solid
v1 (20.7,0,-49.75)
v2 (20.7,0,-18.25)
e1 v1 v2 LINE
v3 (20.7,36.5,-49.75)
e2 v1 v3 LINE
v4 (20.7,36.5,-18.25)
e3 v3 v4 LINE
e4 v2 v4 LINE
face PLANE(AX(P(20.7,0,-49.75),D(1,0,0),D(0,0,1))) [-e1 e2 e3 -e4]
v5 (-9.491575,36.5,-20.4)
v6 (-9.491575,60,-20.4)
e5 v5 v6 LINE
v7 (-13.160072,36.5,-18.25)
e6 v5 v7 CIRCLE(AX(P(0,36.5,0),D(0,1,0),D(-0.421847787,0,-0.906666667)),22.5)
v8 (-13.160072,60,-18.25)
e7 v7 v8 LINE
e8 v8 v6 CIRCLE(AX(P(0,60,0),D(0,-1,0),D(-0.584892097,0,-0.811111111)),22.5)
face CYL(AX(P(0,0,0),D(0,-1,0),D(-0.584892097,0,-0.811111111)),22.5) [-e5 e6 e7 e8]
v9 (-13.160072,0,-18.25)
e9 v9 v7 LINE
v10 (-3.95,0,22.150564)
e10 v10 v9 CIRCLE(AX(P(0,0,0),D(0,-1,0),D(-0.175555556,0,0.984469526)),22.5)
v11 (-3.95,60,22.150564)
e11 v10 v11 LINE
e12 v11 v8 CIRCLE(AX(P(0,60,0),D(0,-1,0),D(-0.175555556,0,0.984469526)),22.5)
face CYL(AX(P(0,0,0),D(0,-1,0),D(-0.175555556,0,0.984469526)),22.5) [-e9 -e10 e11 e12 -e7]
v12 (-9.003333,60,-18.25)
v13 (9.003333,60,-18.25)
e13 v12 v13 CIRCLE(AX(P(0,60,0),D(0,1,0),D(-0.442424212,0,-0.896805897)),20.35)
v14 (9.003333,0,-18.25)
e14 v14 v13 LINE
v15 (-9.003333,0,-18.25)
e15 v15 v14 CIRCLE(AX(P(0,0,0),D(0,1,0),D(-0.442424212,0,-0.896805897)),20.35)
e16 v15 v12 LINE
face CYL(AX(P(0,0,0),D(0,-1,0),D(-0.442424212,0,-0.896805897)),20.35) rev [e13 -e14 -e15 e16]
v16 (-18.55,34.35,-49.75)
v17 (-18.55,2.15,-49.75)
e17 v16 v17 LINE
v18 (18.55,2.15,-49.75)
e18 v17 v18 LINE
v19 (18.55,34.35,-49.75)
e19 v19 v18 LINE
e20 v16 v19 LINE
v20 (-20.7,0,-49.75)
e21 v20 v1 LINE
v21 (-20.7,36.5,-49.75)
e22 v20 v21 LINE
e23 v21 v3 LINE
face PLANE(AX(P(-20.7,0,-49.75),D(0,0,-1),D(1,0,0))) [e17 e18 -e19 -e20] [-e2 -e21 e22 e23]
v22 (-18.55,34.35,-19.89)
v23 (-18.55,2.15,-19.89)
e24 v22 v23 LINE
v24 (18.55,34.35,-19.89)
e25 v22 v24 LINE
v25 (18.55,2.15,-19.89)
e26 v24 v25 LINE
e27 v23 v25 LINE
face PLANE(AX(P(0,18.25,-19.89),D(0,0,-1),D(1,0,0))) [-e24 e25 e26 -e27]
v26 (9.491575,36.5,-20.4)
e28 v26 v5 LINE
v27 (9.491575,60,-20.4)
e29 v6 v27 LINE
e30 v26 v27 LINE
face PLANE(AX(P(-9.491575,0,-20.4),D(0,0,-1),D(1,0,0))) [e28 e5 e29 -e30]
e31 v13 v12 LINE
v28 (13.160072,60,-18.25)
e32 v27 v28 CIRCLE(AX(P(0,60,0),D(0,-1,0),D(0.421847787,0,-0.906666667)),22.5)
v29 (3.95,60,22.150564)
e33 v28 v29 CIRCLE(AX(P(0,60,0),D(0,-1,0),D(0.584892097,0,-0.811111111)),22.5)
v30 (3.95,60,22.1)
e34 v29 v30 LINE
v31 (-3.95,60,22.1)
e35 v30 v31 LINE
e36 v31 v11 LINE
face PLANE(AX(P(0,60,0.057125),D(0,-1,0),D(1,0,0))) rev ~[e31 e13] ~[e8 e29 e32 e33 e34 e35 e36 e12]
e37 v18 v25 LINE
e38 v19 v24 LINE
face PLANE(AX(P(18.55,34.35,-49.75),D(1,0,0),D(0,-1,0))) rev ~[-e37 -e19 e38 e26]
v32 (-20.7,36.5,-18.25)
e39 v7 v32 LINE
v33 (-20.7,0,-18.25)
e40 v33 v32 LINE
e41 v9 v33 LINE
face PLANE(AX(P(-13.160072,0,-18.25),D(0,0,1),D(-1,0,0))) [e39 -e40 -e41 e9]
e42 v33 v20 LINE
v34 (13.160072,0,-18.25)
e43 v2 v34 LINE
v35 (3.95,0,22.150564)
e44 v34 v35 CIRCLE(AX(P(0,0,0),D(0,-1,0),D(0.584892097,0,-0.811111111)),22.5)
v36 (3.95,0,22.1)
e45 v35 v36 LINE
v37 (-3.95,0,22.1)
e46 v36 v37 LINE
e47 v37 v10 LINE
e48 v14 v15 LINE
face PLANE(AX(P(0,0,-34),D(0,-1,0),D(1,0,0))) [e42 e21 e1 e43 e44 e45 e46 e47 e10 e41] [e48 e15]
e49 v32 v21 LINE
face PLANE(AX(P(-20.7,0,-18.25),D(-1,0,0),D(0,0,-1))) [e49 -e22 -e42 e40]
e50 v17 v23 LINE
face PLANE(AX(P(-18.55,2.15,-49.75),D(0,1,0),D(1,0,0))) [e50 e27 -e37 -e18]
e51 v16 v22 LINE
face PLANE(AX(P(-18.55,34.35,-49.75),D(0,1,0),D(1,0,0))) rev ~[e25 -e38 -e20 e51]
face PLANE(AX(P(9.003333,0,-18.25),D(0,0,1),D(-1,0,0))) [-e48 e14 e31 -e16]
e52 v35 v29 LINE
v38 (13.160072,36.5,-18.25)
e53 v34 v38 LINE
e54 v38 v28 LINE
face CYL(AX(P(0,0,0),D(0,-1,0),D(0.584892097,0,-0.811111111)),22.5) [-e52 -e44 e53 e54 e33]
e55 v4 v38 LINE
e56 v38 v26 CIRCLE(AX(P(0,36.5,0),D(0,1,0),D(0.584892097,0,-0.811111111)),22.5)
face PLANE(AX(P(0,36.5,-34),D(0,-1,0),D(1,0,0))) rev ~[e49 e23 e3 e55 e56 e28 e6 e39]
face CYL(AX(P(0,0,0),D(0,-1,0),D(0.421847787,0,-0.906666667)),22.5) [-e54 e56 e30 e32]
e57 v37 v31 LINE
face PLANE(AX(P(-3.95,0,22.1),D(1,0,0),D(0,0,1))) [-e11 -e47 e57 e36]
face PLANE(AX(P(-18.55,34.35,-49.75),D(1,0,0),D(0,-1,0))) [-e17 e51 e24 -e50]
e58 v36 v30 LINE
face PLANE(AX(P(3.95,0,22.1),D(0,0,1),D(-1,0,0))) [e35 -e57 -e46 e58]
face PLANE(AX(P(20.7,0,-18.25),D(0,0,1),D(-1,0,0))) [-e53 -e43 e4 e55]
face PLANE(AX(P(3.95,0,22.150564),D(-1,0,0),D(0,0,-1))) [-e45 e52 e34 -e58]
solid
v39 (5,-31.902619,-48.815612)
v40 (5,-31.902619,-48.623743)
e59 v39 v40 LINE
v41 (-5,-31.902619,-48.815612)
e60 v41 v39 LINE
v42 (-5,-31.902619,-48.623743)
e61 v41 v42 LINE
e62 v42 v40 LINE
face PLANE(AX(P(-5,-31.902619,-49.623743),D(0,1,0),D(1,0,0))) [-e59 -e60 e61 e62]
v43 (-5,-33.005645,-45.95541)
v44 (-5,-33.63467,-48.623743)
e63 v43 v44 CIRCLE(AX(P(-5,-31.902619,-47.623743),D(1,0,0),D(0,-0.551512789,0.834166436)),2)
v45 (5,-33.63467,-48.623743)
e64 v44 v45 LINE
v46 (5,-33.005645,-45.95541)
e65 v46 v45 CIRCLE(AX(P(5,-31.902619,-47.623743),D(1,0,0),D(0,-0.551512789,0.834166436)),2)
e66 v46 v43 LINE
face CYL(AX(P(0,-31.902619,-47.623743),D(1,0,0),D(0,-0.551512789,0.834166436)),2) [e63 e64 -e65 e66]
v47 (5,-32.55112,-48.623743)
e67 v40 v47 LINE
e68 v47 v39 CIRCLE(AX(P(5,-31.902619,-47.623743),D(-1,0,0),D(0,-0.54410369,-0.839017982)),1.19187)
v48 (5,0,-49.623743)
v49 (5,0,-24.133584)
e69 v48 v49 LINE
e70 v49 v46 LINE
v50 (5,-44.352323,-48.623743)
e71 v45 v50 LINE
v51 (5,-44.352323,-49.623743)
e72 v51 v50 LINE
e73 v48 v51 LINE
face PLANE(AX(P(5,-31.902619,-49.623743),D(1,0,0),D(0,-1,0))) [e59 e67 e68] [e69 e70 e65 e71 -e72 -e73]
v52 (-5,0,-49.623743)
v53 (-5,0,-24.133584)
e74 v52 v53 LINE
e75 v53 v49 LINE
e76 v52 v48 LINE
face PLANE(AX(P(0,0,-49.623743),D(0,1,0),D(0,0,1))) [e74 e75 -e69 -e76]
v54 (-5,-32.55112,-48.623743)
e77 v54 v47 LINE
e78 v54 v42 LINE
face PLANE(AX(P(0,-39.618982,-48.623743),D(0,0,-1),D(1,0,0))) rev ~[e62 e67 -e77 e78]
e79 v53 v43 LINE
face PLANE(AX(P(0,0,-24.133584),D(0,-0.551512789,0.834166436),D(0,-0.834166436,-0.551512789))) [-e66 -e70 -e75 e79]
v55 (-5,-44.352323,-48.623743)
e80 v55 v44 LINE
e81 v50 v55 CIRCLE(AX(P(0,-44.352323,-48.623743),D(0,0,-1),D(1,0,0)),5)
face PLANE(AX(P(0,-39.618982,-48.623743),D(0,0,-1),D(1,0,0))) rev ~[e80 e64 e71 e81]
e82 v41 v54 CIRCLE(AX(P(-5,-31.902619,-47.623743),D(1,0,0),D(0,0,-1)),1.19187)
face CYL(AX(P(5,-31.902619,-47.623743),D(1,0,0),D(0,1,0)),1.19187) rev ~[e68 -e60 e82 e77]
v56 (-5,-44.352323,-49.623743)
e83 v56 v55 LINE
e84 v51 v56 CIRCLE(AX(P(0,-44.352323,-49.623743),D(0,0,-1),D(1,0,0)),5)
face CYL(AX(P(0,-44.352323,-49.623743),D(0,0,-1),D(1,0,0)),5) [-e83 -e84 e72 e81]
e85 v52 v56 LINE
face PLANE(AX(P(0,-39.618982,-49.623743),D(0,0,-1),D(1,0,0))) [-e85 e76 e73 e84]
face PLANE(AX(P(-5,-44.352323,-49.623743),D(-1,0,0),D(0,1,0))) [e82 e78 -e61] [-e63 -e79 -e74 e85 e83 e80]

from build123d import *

# Parameters (mm, degrees)
F2_DEPTH  = 60
F3_DEPTH  = 36.5
F4_W      = 37.1
F4_H      = 32.2
F5_DEPTH  = 29.86
F7_DEPTH  = 5
F8_R      = 1.1918695684
F9_DEPTH  = 27.501
F11_DEPTH = 1


# Not quite as in the source:
# - the program builds the solid bodies; features that only make, move or delete a surface that nothing else refers to are left out


with BuildPart() as f2:
    # F0 (on Front) → F2 (new body)
    with BuildSketch(Plane.XZ):
        with BuildLine():
            Line((-9.4915752117, -20.4), (9.4915752117, -20.4))
            ThreePointArc((9.4915752117, -20.4), (11.3767265715, -19.4118544327), (13.1600721883, -18.25))
            ThreePointArc((13.1600721883, -18.25), (21.9371840047, 5.0009956954), (3.95, 22.1505643269))
            Line((3.95, 22.1505643269), (3.95, 22.1))
            Line((3.95, 22.1), (1.55, 22.1))
            Line((1.55, 22.1), (-1.55, 22.1))
            Line((-1.55, 22.1), (-3.95, 22.1))
            Line((-3.95, 22.1), (-3.95, 22.1505643269))
            ThreePointArc((-3.95, 22.1505643269), (-21.9371840047, 5.0009956954), (-13.1600721883, -18.25))
            ThreePointArc((-13.1600721883, -18.25), (-11.3767265715, -19.4118544327), (-9.4915752117, -20.4))
        make_face()
        with BuildLine():
            ThreePointArc((-9.0033327163, -18.25), (0, 20.35), (9.0033327163, -18.25))
            Line((9.0033327163, -18.25), (-3.61e-08, -18.25))
            Line((-3.61e-08, -18.25), (-9.0033327163, -18.25))
        make_face(mode=Mode.SUBTRACT)
    extrude(amount=-F2_DEPTH)

    # F0 (on Front) → F3 (join)
    with BuildSketch(Plane.XZ):
        Polygon((18.55, -20.4), (9.4915752117, -20.4), (-9.4915752117, -20.4), (-18.55, -20.4), (-18.55, -47.6), (18.55, -47.6), align=None)
        with BuildLine():
            ThreePointArc((13.1600721883, -18.25), (11.3767265715, -19.4118544327), (9.4915752117, -20.4))
            Line((9.4915752117, -20.4), (18.55, -20.4))
            Line((18.55, -20.4), (18.55, -47.6))
            Line((18.55, -47.6), (-18.55, -47.6))
            Line((-18.55, -47.6), (-18.55, -20.4))
            Line((-18.55, -20.4), (-9.4915752117, -20.4))
            ThreePointArc((-9.4915752117, -20.4), (-11.3767265715, -19.4118544327), (-13.1600721883, -18.25))
            Line((-13.1600721883, -18.25), (-15.4320283826, -18.25))
            Line((-15.4320283826, -18.25), (-20.7, -18.25))
            Line((-20.7, -18.25), (-20.7, -49.75))
            Line((-20.7, -49.75), (20.7, -49.75))
            Line((20.7, -49.75), (20.7, -18.25))
            Line((20.7, -18.25), (15.4320283826, -18.25))
            Line((15.4320283826, -18.25), (13.1600721883, -18.25))
        make_face()
    extrude(amount=-F3_DEPTH)

    # F4 (on face) → F5 (cut)
    with BuildSketch(Plane(origin=(0, 0, -49.75), x_dir=(1, 0, 0), z_dir=(0, 0, -1))):
        with Locations((0, -18.25)):
            Rectangle(F4_W, F4_H)
    extrude(amount=-F5_DEPTH, mode=Mode.SUBTRACT)


with BuildPart() as f7:
    # F6 (on Right) → F7 (new body, symmetric)
    with BuildSketch(Plane.YZ):
        with BuildLine():
            Line((-31.902618946, -49.6237426996), (0, -49.6237426996))
            Line((0, -49.6237426996), (0, -24.1335835308))
            Line((0, -24.1335835308), (-33.0056445246, -45.9554098272))
            ThreePointArc((-33.0056445246, -45.9554098272), (-33.8179081859, -48.1996481846), (-31.902618946, -49.6237426996))
        make_face()
    extrude(amount=F7_DEPTH, both=True)

    # F8 (on face) → F9 (cut, through all)
    with BuildSketch(Plane.YZ.offset(5)):
        with Locations((-31.902618946, -47.6237426996)):
            Circle(F8_R)
    extrude(amount=-F9_DEPTH, mode=Mode.SUBTRACT)

    # F10 (on face) → F11 (join)
    with BuildSketch(Plane(origin=(0, 0, -49.6237426996), x_dir=(1, 0, 0), z_dir=(0, 0, -1))):
        with BuildLine():
            Line((-5, 44.3523228168), (-5, 31.902618946))
            Line((-5, 31.902618946), (5, 31.902618946))
            Line((5, 31.902618946), (5, 44.3523228168))
            ThreePointArc((5, 44.3523228168), (0, 49.3523228168), (-5, 44.3523228168))
        make_face()
    extrude(amount=-F11_DEPTH)


solid = Compound([f2.part, f7.part])
